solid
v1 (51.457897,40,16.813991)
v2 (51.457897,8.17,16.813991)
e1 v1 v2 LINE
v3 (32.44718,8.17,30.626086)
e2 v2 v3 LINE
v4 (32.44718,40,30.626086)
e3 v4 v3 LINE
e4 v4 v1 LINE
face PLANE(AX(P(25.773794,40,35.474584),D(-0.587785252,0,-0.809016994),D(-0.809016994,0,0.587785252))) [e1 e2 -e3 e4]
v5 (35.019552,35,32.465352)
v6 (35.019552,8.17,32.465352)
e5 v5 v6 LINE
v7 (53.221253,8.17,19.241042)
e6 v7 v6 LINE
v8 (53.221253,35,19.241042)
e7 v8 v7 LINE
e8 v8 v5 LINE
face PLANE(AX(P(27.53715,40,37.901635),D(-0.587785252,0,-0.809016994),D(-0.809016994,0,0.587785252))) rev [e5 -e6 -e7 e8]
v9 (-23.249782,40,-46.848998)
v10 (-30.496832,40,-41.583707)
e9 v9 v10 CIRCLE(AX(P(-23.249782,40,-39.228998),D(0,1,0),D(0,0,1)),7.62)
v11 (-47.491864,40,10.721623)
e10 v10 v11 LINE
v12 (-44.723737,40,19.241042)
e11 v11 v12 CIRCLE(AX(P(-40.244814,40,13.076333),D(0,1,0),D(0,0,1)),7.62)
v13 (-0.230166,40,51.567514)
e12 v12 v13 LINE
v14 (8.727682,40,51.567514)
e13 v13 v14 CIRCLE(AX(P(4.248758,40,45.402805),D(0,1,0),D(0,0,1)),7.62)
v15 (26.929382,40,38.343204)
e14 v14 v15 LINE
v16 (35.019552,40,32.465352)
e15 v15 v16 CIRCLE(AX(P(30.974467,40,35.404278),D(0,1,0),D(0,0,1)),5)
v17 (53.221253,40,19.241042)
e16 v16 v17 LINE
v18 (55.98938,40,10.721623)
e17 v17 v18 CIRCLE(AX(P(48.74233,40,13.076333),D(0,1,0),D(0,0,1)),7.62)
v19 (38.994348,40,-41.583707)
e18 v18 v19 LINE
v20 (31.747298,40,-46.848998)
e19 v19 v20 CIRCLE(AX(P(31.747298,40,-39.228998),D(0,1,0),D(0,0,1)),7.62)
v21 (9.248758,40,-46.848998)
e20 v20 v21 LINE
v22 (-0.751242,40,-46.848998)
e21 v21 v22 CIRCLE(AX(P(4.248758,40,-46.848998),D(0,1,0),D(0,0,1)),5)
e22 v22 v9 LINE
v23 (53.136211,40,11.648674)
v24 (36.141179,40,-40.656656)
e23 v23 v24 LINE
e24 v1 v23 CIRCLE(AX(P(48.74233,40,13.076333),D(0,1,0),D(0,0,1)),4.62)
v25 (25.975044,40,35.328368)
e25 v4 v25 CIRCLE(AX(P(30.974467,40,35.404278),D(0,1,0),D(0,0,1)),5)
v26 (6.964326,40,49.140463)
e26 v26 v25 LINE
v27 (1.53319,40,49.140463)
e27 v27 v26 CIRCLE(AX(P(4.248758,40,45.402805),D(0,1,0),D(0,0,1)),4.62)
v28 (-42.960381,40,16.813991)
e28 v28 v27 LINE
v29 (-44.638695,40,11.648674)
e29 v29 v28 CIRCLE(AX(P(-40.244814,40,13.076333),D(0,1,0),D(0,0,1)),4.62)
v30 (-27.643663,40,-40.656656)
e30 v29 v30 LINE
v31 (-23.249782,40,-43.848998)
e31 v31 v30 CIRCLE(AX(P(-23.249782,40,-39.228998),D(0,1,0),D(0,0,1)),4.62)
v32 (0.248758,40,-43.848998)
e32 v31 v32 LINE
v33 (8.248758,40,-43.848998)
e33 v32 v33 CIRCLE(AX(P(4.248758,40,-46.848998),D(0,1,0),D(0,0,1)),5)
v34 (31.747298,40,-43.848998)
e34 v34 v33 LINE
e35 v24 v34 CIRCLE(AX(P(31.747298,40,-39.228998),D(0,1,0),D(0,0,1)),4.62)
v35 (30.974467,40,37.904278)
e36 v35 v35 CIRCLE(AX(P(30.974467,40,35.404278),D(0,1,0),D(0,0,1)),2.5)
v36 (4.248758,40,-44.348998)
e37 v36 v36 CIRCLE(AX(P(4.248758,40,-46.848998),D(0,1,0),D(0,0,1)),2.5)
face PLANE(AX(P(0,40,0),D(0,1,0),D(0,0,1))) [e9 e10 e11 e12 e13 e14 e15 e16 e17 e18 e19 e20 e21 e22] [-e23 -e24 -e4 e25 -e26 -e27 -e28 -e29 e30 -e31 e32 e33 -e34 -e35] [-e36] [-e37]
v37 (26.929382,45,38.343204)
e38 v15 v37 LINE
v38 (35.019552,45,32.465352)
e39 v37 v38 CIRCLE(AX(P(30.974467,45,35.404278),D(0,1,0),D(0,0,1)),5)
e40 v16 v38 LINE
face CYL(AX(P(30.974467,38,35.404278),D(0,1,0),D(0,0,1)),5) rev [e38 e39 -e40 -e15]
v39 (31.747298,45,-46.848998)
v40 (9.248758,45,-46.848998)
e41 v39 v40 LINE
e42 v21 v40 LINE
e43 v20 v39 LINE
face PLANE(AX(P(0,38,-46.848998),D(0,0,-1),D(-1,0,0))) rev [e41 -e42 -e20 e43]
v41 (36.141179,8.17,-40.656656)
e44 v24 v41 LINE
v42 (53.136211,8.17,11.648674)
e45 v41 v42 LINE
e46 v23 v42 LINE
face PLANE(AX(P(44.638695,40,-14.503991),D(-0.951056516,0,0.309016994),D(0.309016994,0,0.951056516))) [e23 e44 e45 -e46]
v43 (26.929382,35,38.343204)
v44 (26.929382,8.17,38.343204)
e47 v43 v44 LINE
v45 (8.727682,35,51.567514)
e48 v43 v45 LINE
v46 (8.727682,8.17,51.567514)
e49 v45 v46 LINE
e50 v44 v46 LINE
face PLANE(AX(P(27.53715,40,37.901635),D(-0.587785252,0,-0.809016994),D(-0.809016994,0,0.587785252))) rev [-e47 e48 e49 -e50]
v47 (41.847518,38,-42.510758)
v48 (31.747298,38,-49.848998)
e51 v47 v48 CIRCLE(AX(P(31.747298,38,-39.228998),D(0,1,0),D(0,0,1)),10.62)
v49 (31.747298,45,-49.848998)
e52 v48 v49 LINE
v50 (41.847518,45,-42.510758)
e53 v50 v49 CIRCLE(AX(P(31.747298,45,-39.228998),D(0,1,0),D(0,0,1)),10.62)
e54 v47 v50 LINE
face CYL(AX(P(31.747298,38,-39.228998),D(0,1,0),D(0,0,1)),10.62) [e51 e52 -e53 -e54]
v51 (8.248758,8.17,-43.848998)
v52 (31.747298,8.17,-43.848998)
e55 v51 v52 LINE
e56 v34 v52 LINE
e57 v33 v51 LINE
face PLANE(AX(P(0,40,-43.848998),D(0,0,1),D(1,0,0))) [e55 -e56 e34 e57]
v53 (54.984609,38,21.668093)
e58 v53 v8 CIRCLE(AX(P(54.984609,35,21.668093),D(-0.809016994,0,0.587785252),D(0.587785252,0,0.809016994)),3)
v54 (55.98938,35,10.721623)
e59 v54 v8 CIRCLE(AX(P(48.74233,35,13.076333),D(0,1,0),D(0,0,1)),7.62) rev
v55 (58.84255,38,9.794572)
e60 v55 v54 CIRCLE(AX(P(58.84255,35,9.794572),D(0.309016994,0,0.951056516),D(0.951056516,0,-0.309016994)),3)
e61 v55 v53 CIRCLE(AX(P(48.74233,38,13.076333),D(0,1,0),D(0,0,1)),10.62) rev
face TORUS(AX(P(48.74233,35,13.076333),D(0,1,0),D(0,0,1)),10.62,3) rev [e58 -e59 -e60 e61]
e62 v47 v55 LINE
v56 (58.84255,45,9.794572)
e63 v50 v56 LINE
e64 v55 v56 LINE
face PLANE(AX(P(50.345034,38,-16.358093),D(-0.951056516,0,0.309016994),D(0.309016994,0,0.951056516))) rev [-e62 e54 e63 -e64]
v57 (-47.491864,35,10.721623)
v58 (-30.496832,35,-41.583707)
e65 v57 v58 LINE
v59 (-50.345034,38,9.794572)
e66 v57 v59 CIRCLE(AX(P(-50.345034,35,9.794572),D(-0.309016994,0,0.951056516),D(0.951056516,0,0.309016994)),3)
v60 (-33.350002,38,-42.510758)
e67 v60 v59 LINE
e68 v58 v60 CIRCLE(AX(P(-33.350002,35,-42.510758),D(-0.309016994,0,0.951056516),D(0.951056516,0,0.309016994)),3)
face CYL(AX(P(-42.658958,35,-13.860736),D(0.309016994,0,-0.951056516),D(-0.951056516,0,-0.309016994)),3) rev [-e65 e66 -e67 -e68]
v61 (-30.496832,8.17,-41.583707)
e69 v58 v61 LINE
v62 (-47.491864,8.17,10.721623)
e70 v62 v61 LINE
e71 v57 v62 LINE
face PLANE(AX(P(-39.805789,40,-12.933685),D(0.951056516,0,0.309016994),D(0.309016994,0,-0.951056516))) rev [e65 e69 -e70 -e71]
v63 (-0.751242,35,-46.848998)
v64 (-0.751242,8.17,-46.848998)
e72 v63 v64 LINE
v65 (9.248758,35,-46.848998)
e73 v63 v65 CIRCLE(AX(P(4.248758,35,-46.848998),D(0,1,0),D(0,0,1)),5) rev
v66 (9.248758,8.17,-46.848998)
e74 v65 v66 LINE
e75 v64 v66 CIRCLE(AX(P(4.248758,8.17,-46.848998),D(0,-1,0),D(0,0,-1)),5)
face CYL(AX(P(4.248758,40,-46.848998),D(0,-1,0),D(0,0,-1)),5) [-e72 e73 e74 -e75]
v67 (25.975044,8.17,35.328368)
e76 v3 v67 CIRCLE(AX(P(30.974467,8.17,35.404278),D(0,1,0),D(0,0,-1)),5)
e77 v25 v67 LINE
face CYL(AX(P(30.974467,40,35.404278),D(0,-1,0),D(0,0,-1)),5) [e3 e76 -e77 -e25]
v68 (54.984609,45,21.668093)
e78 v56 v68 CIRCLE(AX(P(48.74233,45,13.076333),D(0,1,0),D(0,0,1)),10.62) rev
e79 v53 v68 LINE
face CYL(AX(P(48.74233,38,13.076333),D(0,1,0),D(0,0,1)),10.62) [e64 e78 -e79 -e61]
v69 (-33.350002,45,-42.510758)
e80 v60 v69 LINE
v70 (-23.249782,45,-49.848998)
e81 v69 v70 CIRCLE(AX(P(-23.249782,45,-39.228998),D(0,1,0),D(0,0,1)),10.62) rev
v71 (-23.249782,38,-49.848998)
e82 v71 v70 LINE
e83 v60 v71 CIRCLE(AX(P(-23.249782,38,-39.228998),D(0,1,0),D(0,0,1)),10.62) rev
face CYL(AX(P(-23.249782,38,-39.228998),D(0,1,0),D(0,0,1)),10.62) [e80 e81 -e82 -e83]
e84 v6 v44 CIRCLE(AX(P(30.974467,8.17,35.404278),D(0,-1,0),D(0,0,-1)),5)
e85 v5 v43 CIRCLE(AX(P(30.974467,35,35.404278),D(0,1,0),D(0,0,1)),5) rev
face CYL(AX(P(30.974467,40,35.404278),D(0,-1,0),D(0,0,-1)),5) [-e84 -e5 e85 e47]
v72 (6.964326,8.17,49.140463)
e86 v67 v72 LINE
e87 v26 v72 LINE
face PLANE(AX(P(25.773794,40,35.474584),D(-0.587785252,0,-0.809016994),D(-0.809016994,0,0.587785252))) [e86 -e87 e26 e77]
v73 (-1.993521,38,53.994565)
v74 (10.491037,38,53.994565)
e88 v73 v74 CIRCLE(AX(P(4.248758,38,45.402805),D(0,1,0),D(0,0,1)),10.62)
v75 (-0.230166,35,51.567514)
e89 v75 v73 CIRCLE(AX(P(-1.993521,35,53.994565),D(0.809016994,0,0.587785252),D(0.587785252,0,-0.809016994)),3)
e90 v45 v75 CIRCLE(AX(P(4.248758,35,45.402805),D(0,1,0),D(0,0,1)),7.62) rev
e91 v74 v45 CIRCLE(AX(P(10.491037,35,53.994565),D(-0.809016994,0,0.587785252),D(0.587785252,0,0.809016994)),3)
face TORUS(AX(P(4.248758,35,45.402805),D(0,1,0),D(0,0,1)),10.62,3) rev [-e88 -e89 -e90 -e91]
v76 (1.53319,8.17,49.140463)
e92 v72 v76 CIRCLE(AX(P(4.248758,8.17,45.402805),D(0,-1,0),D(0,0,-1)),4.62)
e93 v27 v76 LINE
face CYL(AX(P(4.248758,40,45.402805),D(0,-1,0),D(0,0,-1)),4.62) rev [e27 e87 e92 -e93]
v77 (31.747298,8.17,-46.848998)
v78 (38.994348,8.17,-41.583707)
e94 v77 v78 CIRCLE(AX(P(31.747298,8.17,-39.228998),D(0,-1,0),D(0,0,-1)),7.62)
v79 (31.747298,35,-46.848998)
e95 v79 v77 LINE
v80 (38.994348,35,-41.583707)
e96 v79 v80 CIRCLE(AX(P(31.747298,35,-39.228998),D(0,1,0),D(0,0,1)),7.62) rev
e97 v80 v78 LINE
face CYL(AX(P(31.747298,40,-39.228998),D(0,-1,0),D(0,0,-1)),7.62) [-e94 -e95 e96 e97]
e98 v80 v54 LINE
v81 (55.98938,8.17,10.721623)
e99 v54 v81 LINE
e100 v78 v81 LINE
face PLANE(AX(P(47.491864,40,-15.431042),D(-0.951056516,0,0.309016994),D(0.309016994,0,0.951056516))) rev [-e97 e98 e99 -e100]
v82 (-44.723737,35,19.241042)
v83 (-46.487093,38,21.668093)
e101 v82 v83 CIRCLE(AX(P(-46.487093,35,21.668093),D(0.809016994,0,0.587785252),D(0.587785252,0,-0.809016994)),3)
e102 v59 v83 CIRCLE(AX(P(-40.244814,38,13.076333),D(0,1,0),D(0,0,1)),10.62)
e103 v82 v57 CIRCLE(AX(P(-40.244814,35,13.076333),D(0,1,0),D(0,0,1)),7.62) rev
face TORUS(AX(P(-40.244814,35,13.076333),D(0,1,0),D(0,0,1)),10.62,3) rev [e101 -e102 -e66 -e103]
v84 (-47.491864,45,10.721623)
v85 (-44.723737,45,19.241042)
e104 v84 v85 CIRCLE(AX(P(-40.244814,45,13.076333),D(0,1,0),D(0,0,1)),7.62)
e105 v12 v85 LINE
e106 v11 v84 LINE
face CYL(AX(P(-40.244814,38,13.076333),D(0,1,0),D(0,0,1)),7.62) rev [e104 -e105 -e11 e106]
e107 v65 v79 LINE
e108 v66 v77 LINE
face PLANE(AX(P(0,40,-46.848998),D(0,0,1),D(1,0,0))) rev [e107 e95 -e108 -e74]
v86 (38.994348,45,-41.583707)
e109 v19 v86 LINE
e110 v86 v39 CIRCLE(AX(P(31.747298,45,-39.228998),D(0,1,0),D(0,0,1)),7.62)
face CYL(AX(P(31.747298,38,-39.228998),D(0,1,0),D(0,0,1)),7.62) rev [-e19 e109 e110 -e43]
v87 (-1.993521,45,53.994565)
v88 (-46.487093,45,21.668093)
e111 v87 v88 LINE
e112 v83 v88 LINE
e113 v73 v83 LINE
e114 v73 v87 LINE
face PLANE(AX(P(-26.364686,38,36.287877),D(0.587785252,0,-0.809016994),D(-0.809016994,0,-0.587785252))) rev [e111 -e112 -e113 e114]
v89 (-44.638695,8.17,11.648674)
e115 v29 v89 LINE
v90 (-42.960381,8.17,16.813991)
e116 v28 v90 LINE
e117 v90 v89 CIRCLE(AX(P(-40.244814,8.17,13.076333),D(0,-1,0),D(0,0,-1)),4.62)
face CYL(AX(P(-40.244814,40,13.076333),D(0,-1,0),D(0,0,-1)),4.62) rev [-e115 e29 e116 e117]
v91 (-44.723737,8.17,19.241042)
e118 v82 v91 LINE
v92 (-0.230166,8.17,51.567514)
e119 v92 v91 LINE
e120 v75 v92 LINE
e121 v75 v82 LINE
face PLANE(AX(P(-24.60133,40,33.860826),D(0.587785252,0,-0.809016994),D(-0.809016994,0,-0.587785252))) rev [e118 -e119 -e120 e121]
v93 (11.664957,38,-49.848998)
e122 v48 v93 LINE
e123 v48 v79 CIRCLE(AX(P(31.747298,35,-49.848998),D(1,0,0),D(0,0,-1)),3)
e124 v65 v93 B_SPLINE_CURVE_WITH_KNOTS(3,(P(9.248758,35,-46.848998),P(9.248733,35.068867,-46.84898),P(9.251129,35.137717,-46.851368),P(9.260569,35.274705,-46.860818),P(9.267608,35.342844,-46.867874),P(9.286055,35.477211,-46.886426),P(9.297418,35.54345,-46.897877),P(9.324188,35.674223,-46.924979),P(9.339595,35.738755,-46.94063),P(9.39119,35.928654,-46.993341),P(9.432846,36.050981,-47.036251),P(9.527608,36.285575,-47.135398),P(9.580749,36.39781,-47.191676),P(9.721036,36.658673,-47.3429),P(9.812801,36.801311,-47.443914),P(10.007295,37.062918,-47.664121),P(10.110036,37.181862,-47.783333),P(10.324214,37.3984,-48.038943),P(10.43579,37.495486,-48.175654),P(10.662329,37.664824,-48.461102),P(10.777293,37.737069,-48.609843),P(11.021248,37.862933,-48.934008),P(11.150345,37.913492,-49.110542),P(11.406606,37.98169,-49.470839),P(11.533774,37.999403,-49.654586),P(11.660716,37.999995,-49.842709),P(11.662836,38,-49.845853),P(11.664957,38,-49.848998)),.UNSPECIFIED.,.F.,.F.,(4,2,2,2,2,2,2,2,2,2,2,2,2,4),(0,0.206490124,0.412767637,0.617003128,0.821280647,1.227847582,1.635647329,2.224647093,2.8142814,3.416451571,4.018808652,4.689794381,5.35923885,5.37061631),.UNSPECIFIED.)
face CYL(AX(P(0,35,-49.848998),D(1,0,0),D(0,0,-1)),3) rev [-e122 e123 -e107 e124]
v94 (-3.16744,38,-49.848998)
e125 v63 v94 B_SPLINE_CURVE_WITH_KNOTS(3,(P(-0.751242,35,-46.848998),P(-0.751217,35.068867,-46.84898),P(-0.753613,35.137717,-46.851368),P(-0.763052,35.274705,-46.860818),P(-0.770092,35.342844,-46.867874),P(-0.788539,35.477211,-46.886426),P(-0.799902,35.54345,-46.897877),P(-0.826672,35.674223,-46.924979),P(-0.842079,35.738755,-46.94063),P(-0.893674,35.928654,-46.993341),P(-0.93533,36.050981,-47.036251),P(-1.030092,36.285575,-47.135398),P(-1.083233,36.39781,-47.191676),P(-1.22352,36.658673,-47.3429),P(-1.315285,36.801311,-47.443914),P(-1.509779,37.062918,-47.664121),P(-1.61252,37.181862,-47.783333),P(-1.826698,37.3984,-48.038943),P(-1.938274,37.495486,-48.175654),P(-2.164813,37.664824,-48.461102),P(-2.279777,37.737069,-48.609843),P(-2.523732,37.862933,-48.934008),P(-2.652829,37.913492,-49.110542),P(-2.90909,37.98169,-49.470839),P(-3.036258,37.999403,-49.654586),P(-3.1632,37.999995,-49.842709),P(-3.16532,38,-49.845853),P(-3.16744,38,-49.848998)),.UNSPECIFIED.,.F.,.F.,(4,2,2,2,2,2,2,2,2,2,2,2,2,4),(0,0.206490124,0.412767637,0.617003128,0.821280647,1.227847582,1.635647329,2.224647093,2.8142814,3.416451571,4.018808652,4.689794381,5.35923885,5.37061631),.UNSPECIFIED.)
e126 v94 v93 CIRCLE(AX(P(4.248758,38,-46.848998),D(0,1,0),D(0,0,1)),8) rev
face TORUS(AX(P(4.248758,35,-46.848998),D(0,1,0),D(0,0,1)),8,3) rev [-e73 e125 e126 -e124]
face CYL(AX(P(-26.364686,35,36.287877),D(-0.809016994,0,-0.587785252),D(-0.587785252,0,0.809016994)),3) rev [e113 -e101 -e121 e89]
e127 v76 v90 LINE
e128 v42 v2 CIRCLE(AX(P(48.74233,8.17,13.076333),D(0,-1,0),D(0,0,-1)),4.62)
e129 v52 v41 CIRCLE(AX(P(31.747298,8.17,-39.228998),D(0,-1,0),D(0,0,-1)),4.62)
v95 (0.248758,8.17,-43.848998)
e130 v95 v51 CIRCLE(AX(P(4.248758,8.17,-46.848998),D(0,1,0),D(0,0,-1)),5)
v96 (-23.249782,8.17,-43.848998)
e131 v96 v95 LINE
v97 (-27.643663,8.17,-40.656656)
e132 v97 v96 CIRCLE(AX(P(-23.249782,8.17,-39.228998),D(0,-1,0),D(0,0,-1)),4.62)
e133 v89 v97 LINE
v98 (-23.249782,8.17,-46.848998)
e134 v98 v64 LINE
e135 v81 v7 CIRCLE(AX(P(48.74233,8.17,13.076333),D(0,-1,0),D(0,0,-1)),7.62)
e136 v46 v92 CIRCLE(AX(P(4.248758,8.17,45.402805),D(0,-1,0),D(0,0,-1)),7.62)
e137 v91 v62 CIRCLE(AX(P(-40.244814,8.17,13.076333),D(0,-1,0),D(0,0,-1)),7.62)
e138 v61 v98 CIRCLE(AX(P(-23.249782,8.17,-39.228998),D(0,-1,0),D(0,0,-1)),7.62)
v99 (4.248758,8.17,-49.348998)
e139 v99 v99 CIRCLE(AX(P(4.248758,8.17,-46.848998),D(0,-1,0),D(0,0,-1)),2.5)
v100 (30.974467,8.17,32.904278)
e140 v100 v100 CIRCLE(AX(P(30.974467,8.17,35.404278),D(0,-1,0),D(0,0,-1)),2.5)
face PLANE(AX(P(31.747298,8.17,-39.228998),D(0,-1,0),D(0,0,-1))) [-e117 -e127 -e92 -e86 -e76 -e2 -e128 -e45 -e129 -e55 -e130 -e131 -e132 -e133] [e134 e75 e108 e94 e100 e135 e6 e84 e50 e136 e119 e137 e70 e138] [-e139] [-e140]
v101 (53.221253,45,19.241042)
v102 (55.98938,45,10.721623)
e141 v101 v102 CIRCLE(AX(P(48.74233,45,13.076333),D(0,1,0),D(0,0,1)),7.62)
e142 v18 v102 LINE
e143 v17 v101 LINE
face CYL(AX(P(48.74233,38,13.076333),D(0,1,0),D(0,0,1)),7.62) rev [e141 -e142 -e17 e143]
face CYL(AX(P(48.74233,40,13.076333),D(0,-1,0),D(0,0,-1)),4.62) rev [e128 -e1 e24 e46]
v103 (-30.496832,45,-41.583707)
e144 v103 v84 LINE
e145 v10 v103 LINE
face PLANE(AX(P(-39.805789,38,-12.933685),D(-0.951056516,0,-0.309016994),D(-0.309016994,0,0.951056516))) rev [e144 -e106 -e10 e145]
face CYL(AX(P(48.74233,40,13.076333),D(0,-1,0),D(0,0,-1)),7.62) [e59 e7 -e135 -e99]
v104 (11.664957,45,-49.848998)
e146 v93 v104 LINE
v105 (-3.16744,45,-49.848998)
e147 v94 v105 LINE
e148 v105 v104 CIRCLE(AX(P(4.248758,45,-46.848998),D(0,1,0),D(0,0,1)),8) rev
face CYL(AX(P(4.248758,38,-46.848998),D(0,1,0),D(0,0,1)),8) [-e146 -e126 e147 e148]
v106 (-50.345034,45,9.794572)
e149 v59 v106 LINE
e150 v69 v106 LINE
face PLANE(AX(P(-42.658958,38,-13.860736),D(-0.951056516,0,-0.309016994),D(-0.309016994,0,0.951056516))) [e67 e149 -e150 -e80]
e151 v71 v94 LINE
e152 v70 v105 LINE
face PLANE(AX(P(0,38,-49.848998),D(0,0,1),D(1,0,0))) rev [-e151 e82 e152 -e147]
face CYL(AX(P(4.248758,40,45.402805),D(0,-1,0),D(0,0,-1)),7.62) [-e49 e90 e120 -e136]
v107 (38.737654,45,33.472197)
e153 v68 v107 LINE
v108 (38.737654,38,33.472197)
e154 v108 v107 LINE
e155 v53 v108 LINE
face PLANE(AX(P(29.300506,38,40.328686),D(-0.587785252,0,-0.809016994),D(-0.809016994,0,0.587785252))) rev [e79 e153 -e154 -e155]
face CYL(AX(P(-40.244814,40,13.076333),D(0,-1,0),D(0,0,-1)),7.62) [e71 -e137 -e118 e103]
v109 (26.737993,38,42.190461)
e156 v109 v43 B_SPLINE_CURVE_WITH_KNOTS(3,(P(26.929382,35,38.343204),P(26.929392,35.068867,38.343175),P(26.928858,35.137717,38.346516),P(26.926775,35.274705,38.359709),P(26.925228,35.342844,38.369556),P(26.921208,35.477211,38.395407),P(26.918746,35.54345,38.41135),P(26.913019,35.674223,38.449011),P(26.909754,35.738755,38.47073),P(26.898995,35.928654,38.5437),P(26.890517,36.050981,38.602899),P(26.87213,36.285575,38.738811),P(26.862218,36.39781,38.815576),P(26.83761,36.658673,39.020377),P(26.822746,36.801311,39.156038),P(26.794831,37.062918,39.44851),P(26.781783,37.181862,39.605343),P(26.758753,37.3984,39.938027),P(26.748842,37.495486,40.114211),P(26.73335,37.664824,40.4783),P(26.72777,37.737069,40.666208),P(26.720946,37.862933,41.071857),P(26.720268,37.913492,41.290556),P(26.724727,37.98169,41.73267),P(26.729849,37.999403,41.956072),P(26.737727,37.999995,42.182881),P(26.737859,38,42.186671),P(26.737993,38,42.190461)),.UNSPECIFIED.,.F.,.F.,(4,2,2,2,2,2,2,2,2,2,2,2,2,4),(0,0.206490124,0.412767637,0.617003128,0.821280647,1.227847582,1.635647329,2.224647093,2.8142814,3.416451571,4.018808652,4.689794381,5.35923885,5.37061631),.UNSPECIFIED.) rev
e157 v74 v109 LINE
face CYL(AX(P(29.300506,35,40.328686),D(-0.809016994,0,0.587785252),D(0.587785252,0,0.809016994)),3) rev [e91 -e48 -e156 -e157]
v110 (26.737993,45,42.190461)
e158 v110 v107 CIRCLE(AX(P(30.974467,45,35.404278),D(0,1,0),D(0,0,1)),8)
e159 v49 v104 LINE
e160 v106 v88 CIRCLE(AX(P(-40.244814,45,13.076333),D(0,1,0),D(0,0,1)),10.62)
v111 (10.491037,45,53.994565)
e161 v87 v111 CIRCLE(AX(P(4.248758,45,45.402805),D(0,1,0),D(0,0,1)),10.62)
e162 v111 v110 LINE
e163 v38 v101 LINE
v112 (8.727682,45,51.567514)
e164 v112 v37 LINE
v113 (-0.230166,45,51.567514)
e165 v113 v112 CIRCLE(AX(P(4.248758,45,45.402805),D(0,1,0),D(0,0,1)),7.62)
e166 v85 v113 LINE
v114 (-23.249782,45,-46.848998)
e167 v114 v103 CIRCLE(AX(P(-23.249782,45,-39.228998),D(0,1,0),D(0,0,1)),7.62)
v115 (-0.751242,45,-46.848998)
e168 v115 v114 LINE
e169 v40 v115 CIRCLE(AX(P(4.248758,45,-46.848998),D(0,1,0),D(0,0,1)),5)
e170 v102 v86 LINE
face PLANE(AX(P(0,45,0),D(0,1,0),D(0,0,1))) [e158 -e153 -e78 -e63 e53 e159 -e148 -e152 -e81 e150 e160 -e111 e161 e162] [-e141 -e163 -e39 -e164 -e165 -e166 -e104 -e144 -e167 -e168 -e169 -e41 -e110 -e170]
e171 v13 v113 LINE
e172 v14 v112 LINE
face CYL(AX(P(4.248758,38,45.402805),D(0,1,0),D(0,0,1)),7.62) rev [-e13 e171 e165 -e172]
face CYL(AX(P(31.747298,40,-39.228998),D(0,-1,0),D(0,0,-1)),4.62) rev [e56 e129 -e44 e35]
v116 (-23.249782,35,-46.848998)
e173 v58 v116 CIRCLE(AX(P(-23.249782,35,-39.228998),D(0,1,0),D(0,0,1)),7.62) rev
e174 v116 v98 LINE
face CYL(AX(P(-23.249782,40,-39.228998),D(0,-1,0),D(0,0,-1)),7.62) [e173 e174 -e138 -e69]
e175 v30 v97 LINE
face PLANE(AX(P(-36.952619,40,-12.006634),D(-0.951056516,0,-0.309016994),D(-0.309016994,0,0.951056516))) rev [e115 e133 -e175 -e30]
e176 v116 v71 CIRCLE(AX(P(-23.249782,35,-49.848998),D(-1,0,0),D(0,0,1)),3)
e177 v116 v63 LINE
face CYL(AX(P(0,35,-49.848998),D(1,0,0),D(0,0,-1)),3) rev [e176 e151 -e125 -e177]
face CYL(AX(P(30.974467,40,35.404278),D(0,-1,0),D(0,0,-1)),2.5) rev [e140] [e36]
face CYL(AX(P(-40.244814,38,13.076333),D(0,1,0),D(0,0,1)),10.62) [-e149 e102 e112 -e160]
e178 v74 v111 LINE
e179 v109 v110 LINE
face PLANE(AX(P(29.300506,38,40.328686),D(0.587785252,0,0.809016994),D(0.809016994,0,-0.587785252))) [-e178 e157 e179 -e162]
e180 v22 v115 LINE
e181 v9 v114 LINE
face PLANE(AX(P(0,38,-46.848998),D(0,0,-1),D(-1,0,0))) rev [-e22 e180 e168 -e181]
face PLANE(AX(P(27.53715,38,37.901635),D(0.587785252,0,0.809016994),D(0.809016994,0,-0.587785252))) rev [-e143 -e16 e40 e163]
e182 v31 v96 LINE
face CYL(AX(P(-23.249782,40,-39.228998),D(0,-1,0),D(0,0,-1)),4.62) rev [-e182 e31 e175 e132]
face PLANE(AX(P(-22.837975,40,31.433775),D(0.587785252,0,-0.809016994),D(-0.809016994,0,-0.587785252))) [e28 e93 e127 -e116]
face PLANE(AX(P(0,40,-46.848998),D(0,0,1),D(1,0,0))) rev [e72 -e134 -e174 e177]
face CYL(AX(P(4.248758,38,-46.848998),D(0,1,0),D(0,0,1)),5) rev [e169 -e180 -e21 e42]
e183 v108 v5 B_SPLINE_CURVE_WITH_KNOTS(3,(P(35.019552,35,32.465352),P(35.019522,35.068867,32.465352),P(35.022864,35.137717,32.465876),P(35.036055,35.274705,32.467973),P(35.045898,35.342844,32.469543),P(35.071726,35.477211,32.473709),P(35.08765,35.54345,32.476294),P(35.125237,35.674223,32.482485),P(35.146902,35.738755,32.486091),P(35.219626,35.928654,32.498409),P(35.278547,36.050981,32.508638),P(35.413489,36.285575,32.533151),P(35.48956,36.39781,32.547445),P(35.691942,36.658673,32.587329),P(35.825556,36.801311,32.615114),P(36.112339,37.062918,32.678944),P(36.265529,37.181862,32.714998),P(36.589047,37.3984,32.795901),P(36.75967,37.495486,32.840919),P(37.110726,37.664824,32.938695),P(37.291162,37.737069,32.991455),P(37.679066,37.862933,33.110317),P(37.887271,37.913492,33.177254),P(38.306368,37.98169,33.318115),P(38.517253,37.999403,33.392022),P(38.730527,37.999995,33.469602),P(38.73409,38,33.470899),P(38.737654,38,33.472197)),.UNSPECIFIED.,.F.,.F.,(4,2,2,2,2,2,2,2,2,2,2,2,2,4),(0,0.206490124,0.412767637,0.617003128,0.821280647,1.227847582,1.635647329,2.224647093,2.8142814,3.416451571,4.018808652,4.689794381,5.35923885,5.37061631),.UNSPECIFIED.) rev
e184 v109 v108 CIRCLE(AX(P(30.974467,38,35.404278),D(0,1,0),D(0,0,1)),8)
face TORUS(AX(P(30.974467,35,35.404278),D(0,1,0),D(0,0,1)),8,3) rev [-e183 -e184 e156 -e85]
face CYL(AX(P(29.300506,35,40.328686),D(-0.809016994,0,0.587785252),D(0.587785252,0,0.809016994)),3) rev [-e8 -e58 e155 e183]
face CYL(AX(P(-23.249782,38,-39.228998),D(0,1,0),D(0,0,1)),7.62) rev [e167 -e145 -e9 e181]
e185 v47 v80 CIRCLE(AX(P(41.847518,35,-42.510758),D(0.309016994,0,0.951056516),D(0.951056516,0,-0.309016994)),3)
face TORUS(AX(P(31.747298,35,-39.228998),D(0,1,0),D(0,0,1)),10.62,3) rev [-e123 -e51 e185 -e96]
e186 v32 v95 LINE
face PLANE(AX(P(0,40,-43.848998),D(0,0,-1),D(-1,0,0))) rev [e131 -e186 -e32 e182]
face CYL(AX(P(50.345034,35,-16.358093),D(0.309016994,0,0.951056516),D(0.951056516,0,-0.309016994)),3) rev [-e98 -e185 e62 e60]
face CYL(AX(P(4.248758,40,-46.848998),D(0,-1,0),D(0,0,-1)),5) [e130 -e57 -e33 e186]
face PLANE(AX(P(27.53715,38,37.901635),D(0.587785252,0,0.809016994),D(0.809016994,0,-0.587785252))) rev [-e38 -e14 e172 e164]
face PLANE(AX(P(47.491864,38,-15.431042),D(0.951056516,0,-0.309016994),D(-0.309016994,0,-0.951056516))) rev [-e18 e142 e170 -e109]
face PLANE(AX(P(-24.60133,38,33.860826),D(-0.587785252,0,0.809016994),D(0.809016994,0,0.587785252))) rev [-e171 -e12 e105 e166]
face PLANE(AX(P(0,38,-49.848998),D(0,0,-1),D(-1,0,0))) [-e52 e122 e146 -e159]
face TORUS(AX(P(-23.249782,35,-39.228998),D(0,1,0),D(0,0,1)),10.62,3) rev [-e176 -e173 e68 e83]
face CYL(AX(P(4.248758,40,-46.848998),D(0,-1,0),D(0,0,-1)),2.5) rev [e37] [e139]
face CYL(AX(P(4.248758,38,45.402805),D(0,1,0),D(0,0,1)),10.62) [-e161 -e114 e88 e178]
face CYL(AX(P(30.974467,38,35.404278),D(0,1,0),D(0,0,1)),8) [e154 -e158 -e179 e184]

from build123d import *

# Parameters (mm, degrees)
SKETCH1_R                = 2.5
BOSS_EXTRUDE1_DEPTH      = 40
BOSS_EXTRUDE2_DEPTH      = 5
BOSS_EXTRUDE2_DEPTH_BACK = 2
FILLET1_R                = 3
BOSS_EXTRUDE3_START      = 7
SKETCH3_R                = 2.5
BOSS_EXTRUDE3_DEPTH      = 7
SKETCH4_R                = 2.5
CUT_EXTRUDE1_DEPTH       = 15.17


with BuildPart() as part:
    # Sketch1 → Boss-Extrude1 (new body)
    # profile 1 of 3: a face of its own
    with BuildSketch(Plane(origin=(0, 0, 0), x_dir=(1, 0, 0), z_dir=(0, 1, 0))):
        with BuildLine():
            Line((55.989380272, -10.721623107), (38.994348201, 41.58370731))
            ThreePointArc((38.994348201, 41.58370731), (36.22622117, 45.39370731), (31.747297547, 46.848997812))
            Line((31.747297547, 46.848997812), (9.248758018, 46.848997812))
            ThreePointArc((9.248758018, 46.848997812), (7.784291924, 50.384531718), (4.248758018, 51.848997812))
            Line((4.248758018, 51.848997812), (4.248758018, 50.848997812))
            ThreePointArc((4.248758018, 50.848997812), (1.420330893, 49.677424937), (0.248758018, 46.848997812))
            Line((0.248758018, 46.848997812), (-23.249781512, 46.848997812))
            ThreePointArc((-23.249781512, 46.848997812), (-27.728705135, 45.39370731), (-30.496832166, 41.58370731))
            Line((-30.496832166, 41.58370731), (-47.491864237, -10.721623107))
            ThreePointArc((-47.491864237, -10.721623107), (-47.491864237, -15.431042101), (-44.723737205, -19.241042101))
            Line((-44.723737205, -19.241042101), (-0.230165605, -51.567514092))
            ThreePointArc((-0.230165605, -51.567514092), (4.248758018, -53.022804594), (8.72768164, -51.567514092))
            Line((8.72768164, -51.567514092), (27.738399463, -37.755419106))
            ThreePointArc((27.738399463, -37.755419106), (30.34872958, -39.355031459), (33.325608449, -38.640346074))
            Line((33.325608449, -38.640346074), (33.913393702, -39.449363068))
            ThreePointArc((33.913393702, -39.449363068), (35.912909143, -36.186450422), (35.019552412, -32.465351835))
            Line((35.019552412, -32.465351835), (53.22125324, -19.241042101))
            ThreePointArc((53.22125324, -19.241042101), (55.989380272, -15.431042101), (55.989380272, -10.721623107))
        make_face()
        with Locations(Location((4.248758018, 46.848997812, 0), (0, 0, 270))):
            Circle(SKETCH1_R, mode=Mode.SUBTRACT)
        with Locations(Location((30.97446744, -35.404278096, 0), (0, 0, 270))):
            Circle(SKETCH1_R, mode=Mode.SUBTRACT)
        with BuildLine():
            ThreePointArc((-23.249781512, 43.848997812), (-25.965349378, 42.966656326), (-27.643662617, 40.656656326))
            Line((-27.643662617, 40.656656326), (-44.638694688, -11.64867409))
            ThreePointArc((-44.638694688, -11.64867409), (-44.638694688, -14.503991118), (-42.960381448, -16.813991118))
            Line((-42.960381448, -16.813991118), (1.533190152, -49.140463108))
            ThreePointArc((1.533190152, -49.140463108), (4.248758018, -50.022804594), (6.964325883, -49.140463108))
            Line((6.964325883, -49.140463108), (25.975043706, -35.328368122))
            ThreePointArc((25.975043706, -35.328368122), (28.035541179, -31.359193125), (32.447179661, -30.626086104))
            Line((32.447179661, -30.626086104), (51.457897483, -16.813991118))
            ThreePointArc((51.457897483, -16.813991118), (53.136210723, -14.503991118), (53.136210723, -11.64867409))
            Line((53.136210723, -11.64867409), (36.141178653, 40.656656326))
            ThreePointArc((36.141178653, 40.656656326), (34.462865413, 42.966656326), (31.747297547, 43.848997812))
            Line((31.747297547, 43.848997812), (8.248758018, 43.848997812))
            ThreePointArc((8.248758018, 43.848997812), (4.248758018, 41.848997812), (0.248758018, 43.848997812))
            Line((0.248758018, 43.848997812), (-23.249781512, 43.848997812))
        make_face(mode=Mode.SUBTRACT)
    # profile 2 of 3: a face of its own
    with BuildSketch(Plane(origin=(0, 0, 0), x_dir=(1, 0, 0), z_dir=(0, 1, 0))):
        with BuildLine():
            ThreePointArc((26.929382468, -38.343204358), (30.192295115, -40.342719799), (33.913393702, -39.449363068))
            Line((33.913393702, -39.449363068), (33.325608449, -38.640346074))
            ThreePointArc((33.325608449, -38.640346074), (30.34872958, -39.355031459), (27.738399463, -37.755419106))
            Line((27.738399463, -37.755419106), (26.929382468, -38.343204358))
        make_face()
    # profile 3 of 3: a face of its own
    with BuildSketch(Plane(origin=(0, 0, 0), x_dir=(1, 0, 0), z_dir=(0, 1, 0))):
        with BuildLine():
            Line((4.248758018, 50.848997812), (4.248758018, 51.848997812))
            ThreePointArc((4.248758018, 51.848997812), (0.713224112, 50.384531718), (-0.751241982, 46.848997812))
            Line((-0.751241982, 46.848997812), (0.248758018, 46.848997812))
            ThreePointArc((0.248758018, 46.848997812), (1.420330893, 49.677424937), (4.248758018, 50.848997812))
        make_face()
    extrude(amount=BOSS_EXTRUDE1_DEPTH)

    # Sketch2 → Boss-Extrude2 (add, two sides: drawn at the far end of the back side and taken through both)
    with BuildSketch(Plane(origin=(0, 40, 0), x_dir=(1, 0, 0), z_dir=(0, 1, 0)).offset(-BOSS_EXTRUDE2_DEPTH_BACK)):
        Polygon((-30.496832166, 41.58370731), (-33.350001715, 42.510758293), (-50.345033785, -9.794572124), (-47.491864237, -10.721623107), align=None)
        with BuildLine():
            Line((-1.993521362, -53.994565075), (-46.487092962, -21.668093084))
            ThreePointArc((-46.487092962, -21.668093084), (-50.345033785, -16.358093084), (-50.345033785, -9.794572124))
            Line((-50.345033785, -9.794572124), (-47.491864237, -10.721623107))
            ThreePointArc((-47.491864237, -10.721623107), (-47.491864237, -15.431042101), (-44.723737205, -19.241042101))
            Line((-44.723737205, -19.241042101), (-0.230165605, -51.567514092))
            ThreePointArc((-0.230165605, -51.567514092), (4.248758018, -53.022804594), (8.72768164, -51.567514092))
            Line((8.72768164, -51.567514092), (26.929382468, -38.343204358))
            ThreePointArc((26.929382468, -38.343204358), (33.913393702, -39.449363068), (35.019552412, -32.465351835))
            Line((35.019552412, -32.465351835), (53.22125324, -19.241042101))
            ThreePointArc((53.22125324, -19.241042101), (55.989380272, -15.431042101), (55.989380272, -10.721623107))
            Line((55.989380272, -10.721623107), (38.994348201, 41.58370731))
            ThreePointArc((38.994348201, 41.58370731), (36.22622117, 45.39370731), (31.747297547, 46.848997812))
            Line((31.747297547, 46.848997812), (9.248758018, 46.848997812))
            ThreePointArc((9.248758018, 46.848997812), (4.248758018, 51.848997812), (-0.751241982, 46.848997812))
            Line((-0.751241982, 46.848997812), (-23.249781512, 46.848997812))
            Line((-23.249781512, 46.848997812), (-23.249781512, 49.848997812))
            Line((-23.249781512, 49.848997812), (-3.16744047, 49.848997812))
            ThreePointArc((-3.16744047, 49.848997812), (4.248758018, 54.848997812), (11.664956505, 49.848997812))
            Line((11.664956505, 49.848997812), (31.747297547, 49.848997812))
            ThreePointArc((31.747297547, 49.848997812), (37.989576927, 47.820758293), (41.84751775, 42.510758293))
            Line((41.84751775, 42.510758293), (58.842549821, -9.794572124))
            ThreePointArc((58.842549821, -9.794572124), (58.842549821, -16.358093084), (54.984608997, -21.668093084))
            Line((54.984608997, -21.668093084), (38.737653807, -33.472196981))
            ThreePointArc((38.737653807, -33.472196981), (35.676749458, -41.876414051), (26.737992587, -42.190461178))
            Line((26.737992587, -42.190461178), (10.491037397, -53.994565075))
            ThreePointArc((10.491037397, -53.994565075), (4.248758018, -56.022804594), (-1.993521362, -53.994565075))
        make_face()
        with BuildLine():
            ThreePointArc((-33.350001715, 42.510758293), (-29.492060891, 47.820758293), (-23.249781512, 49.848997812))
            Line((-23.249781512, 49.848997812), (-23.249781512, 46.848997812))
            ThreePointArc((-23.249781512, 46.848997812), (-27.728705135, 45.39370731), (-30.496832166, 41.58370731))
            Line((-30.496832166, 41.58370731), (-33.350001715, 42.510758293))
        make_face()
    extrude(amount=BOSS_EXTRUDE2_DEPTH + BOSS_EXTRUDE2_DEPTH_BACK)

    # Fillet1
    fillet1_edges = [part.edges().sort_by_distance(p)[0] for p in [
        (-38.994348201, 38, -15.431042101),
        (-47.491864237, 38, 15.431042101),
        (-22.476951405, 38, 35.404278096),
        (4.248758018, 38, 53.022804594),
        (17.828532054, 38, 44.955359225),
        (33.913393702, 38, 39.449363068),
        (44.120402826, 38, 25.853196968),
        (55.989380272, 38, 15.431042101),
        (47.491864237, 38, -15.431042101),
        (36.22622117, 38, -45.39370731),
        (20.498027782, 38, -46.848997812),
        (4.248758018, 38, -51.848997812),
        (-12.000511747, 38, -46.848997812),
        (-27.728705135, 38, -45.39370731),
    ]]
    fillet(fillet1_edges, radius=FILLET1_R - 0.0001)  # a hair under: the kernel refuses the full size

    # Sketch3 → Boss-Extrude3 (add)
    with BuildSketch(Plane.XZ.offset(BOSS_EXTRUDE3_START)):
        with BuildLine():
            Line((38.994348201, -41.58370731), (55.989380272, 10.721623107))
            ThreePointArc((55.989380272, 10.721623107), (55.989380272, 15.431042101), (53.22125324, 19.241042101))
            Line((53.22125324, 19.241042101), (35.019552412, 32.465351835))
            ThreePointArc((35.019552412, 32.465351835), (33.913393702, 39.449363068), (26.929382468, 38.343204358))
            Line((26.929382468, 38.343204358), (8.72768164, 51.567514092))
            ThreePointArc((8.72768164, 51.567514092), (4.248758018, 53.022804594), (-0.230165605, 51.567514092))
            Line((-0.230165605, 51.567514092), (-44.723737205, 19.241042101))
            ThreePointArc((-44.723737205, 19.241042101), (-47.491864237, 15.431042101), (-47.491864237, 10.721623107))
            Line((-47.491864237, 10.721623107), (-30.496832166, -41.58370731))
            ThreePointArc((-30.496832166, -41.58370731), (-27.728705135, -45.39370731), (-23.249781512, -46.848997812))
            Line((-23.249781512, -46.848997812), (-0.751241982, -46.848997812))
            ThreePointArc((-0.751241982, -46.848997812), (4.248758018, -51.848997812), (9.248758018, -46.848997812))
            Line((9.248758018, -46.848997812), (31.747297547, -46.848997812))
            ThreePointArc((31.747297547, -46.848997812), (36.22622117, -45.39370731), (38.994348201, -41.58370731))
        make_face()
        with Locations(Location((30.97446744, 35.404278096, 0), (0, 0, 270))):
            Circle(SKETCH3_R, mode=Mode.SUBTRACT)
        with Locations(Location((4.248758018, -46.848997812, 0), (0, 0, 270))):
            Circle(SKETCH3_R, mode=Mode.SUBTRACT)
        with BuildLine():
            Line((-44.638694688, 11.64867409), (-27.643662617, -40.656656326))
            ThreePointArc((-27.643662617, -40.656656326), (-25.965349378, -42.966656326), (-23.249781512, -43.848997812))
            Line((-23.249781512, -43.848997812), (0.248758018, -43.848997812))
            ThreePointArc((0.248758018, -43.848997812), (4.248758018, -41.848997812), (8.248758018, -43.848997812))
            Line((8.248758018, -43.848997812), (31.747297547, -43.848997812))
            ThreePointArc((31.747297547, -43.848997812), (34.462865413, -42.966656326), (36.141178653, -40.656656326))
            Line((36.141178653, -40.656656326), (53.136210723, 11.64867409))
            ThreePointArc((53.136210723, 11.64867409), (53.136210723, 14.503991118), (51.457897483, 16.813991118))
            Line((51.457897483, 16.813991118), (32.447179661, 30.626086104))
            ThreePointArc((32.447179661, 30.626086104), (28.035541179, 31.359193125), (25.975043706, 35.328368122))
            Line((25.975043706, 35.328368122), (6.964325883, 49.140463108))
            ThreePointArc((6.964325883, 49.140463108), (4.248758018, 50.022804594), (1.533190152, 49.140463108))
            Line((1.533190152, 49.140463108), (-42.960381448, 16.813991118))
            ThreePointArc((-42.960381448, 16.813991118), (-44.638694688, 14.503991118), (-44.638694688, 11.64867409))
        make_face(mode=Mode.SUBTRACT)
    extrude(amount=-BOSS_EXTRUDE3_DEPTH)

    # Sketch4 → Cut-Extrude1 (cut)
    with BuildSketch(Plane.XZ.offset(7)):
        with BuildLine():
            Line((38.994348201, -41.58370731), (55.989380272, 10.721623107))
            ThreePointArc((55.989380272, 10.721623107), (55.989380272, 15.431042101), (53.22125324, 19.241042101))
            Line((53.22125324, 19.241042101), (35.019552412, 32.465351835))
            ThreePointArc((35.019552412, 32.465351835), (33.913393702, 39.449363068), (26.929382468, 38.343204358))
            Line((26.929382468, 38.343204358), (8.72768164, 51.567514092))
            ThreePointArc((8.72768164, 51.567514092), (4.248758018, 53.022804594), (-0.230165605, 51.567514092))
            Line((-0.230165605, 51.567514092), (-44.723737205, 19.241042101))
            ThreePointArc((-44.723737205, 19.241042101), (-47.491864237, 15.431042101), (-47.491864237, 10.721623107))
            Line((-47.491864237, 10.721623107), (-30.496832166, -41.58370731))
            ThreePointArc((-30.496832166, -41.58370731), (-27.728705135, -45.39370731), (-23.249781512, -46.848997812))
            Line((-23.249781512, -46.848997812), (-0.751241982, -46.848997812))
            ThreePointArc((-0.751241982, -46.848997812), (4.248758018, -51.848997812), (9.248758018, -46.848997812))
            Line((9.248758018, -46.848997812), (31.747297547, -46.848997812))
            ThreePointArc((31.747297547, -46.848997812), (36.22622117, -45.39370731), (38.994348201, -41.58370731))
        make_face()
        with Locations(Location((30.97446744, 35.404278096, 0), (0, 0, 270))):
            Circle(SKETCH4_R, mode=Mode.SUBTRACT)
        with Locations(Location((4.248758018, -46.848997812, 0), (0, 0, 270))):
            Circle(SKETCH4_R, mode=Mode.SUBTRACT)
        with BuildLine():
            Line((-23.249781512, -43.848997812), (0.248758018, -43.848997812))
            ThreePointArc((0.248758018, -43.848997812), (4.248758018, -41.848997812), (8.248758018, -43.848997812))
            Line((8.248758018, -43.848997812), (31.747297547, -43.848997812))
            ThreePointArc((31.747297547, -43.848997812), (34.462865413, -42.966656326), (36.141178653, -40.656656326))
            Line((36.141178653, -40.656656326), (53.136210723, 11.64867409))
            ThreePointArc((53.136210723, 11.64867409), (53.136210723, 14.503991118), (51.457897483, 16.813991118))
            Line((51.457897483, 16.813991118), (32.447179661, 30.626086104))
            ThreePointArc((32.447179661, 30.626086104), (28.035541179, 31.359193125), (25.975043706, 35.328368122))
            Line((25.975043706, 35.328368122), (6.964325883, 49.140463108))
            ThreePointArc((6.964325883, 49.140463108), (4.248758018, 50.022804594), (1.533190152, 49.140463108))
            Line((1.533190152, 49.140463108), (-42.960381448, 16.813991118))
            ThreePointArc((-42.960381448, 16.813991118), (-44.638694688, 14.503991118), (-44.638694688, 11.64867409))
            Line((-44.638694688, 11.64867409), (-27.643662617, -40.656656326))
            ThreePointArc((-27.643662617, -40.656656326), (-25.965349378, -42.966656326), (-23.249781512, -43.848997812))
        make_face(mode=Mode.SUBTRACT)
    extrude(amount=-CUT_EXTRUDE1_DEPTH, mode=Mode.SUBTRACT)


solid = part.part
